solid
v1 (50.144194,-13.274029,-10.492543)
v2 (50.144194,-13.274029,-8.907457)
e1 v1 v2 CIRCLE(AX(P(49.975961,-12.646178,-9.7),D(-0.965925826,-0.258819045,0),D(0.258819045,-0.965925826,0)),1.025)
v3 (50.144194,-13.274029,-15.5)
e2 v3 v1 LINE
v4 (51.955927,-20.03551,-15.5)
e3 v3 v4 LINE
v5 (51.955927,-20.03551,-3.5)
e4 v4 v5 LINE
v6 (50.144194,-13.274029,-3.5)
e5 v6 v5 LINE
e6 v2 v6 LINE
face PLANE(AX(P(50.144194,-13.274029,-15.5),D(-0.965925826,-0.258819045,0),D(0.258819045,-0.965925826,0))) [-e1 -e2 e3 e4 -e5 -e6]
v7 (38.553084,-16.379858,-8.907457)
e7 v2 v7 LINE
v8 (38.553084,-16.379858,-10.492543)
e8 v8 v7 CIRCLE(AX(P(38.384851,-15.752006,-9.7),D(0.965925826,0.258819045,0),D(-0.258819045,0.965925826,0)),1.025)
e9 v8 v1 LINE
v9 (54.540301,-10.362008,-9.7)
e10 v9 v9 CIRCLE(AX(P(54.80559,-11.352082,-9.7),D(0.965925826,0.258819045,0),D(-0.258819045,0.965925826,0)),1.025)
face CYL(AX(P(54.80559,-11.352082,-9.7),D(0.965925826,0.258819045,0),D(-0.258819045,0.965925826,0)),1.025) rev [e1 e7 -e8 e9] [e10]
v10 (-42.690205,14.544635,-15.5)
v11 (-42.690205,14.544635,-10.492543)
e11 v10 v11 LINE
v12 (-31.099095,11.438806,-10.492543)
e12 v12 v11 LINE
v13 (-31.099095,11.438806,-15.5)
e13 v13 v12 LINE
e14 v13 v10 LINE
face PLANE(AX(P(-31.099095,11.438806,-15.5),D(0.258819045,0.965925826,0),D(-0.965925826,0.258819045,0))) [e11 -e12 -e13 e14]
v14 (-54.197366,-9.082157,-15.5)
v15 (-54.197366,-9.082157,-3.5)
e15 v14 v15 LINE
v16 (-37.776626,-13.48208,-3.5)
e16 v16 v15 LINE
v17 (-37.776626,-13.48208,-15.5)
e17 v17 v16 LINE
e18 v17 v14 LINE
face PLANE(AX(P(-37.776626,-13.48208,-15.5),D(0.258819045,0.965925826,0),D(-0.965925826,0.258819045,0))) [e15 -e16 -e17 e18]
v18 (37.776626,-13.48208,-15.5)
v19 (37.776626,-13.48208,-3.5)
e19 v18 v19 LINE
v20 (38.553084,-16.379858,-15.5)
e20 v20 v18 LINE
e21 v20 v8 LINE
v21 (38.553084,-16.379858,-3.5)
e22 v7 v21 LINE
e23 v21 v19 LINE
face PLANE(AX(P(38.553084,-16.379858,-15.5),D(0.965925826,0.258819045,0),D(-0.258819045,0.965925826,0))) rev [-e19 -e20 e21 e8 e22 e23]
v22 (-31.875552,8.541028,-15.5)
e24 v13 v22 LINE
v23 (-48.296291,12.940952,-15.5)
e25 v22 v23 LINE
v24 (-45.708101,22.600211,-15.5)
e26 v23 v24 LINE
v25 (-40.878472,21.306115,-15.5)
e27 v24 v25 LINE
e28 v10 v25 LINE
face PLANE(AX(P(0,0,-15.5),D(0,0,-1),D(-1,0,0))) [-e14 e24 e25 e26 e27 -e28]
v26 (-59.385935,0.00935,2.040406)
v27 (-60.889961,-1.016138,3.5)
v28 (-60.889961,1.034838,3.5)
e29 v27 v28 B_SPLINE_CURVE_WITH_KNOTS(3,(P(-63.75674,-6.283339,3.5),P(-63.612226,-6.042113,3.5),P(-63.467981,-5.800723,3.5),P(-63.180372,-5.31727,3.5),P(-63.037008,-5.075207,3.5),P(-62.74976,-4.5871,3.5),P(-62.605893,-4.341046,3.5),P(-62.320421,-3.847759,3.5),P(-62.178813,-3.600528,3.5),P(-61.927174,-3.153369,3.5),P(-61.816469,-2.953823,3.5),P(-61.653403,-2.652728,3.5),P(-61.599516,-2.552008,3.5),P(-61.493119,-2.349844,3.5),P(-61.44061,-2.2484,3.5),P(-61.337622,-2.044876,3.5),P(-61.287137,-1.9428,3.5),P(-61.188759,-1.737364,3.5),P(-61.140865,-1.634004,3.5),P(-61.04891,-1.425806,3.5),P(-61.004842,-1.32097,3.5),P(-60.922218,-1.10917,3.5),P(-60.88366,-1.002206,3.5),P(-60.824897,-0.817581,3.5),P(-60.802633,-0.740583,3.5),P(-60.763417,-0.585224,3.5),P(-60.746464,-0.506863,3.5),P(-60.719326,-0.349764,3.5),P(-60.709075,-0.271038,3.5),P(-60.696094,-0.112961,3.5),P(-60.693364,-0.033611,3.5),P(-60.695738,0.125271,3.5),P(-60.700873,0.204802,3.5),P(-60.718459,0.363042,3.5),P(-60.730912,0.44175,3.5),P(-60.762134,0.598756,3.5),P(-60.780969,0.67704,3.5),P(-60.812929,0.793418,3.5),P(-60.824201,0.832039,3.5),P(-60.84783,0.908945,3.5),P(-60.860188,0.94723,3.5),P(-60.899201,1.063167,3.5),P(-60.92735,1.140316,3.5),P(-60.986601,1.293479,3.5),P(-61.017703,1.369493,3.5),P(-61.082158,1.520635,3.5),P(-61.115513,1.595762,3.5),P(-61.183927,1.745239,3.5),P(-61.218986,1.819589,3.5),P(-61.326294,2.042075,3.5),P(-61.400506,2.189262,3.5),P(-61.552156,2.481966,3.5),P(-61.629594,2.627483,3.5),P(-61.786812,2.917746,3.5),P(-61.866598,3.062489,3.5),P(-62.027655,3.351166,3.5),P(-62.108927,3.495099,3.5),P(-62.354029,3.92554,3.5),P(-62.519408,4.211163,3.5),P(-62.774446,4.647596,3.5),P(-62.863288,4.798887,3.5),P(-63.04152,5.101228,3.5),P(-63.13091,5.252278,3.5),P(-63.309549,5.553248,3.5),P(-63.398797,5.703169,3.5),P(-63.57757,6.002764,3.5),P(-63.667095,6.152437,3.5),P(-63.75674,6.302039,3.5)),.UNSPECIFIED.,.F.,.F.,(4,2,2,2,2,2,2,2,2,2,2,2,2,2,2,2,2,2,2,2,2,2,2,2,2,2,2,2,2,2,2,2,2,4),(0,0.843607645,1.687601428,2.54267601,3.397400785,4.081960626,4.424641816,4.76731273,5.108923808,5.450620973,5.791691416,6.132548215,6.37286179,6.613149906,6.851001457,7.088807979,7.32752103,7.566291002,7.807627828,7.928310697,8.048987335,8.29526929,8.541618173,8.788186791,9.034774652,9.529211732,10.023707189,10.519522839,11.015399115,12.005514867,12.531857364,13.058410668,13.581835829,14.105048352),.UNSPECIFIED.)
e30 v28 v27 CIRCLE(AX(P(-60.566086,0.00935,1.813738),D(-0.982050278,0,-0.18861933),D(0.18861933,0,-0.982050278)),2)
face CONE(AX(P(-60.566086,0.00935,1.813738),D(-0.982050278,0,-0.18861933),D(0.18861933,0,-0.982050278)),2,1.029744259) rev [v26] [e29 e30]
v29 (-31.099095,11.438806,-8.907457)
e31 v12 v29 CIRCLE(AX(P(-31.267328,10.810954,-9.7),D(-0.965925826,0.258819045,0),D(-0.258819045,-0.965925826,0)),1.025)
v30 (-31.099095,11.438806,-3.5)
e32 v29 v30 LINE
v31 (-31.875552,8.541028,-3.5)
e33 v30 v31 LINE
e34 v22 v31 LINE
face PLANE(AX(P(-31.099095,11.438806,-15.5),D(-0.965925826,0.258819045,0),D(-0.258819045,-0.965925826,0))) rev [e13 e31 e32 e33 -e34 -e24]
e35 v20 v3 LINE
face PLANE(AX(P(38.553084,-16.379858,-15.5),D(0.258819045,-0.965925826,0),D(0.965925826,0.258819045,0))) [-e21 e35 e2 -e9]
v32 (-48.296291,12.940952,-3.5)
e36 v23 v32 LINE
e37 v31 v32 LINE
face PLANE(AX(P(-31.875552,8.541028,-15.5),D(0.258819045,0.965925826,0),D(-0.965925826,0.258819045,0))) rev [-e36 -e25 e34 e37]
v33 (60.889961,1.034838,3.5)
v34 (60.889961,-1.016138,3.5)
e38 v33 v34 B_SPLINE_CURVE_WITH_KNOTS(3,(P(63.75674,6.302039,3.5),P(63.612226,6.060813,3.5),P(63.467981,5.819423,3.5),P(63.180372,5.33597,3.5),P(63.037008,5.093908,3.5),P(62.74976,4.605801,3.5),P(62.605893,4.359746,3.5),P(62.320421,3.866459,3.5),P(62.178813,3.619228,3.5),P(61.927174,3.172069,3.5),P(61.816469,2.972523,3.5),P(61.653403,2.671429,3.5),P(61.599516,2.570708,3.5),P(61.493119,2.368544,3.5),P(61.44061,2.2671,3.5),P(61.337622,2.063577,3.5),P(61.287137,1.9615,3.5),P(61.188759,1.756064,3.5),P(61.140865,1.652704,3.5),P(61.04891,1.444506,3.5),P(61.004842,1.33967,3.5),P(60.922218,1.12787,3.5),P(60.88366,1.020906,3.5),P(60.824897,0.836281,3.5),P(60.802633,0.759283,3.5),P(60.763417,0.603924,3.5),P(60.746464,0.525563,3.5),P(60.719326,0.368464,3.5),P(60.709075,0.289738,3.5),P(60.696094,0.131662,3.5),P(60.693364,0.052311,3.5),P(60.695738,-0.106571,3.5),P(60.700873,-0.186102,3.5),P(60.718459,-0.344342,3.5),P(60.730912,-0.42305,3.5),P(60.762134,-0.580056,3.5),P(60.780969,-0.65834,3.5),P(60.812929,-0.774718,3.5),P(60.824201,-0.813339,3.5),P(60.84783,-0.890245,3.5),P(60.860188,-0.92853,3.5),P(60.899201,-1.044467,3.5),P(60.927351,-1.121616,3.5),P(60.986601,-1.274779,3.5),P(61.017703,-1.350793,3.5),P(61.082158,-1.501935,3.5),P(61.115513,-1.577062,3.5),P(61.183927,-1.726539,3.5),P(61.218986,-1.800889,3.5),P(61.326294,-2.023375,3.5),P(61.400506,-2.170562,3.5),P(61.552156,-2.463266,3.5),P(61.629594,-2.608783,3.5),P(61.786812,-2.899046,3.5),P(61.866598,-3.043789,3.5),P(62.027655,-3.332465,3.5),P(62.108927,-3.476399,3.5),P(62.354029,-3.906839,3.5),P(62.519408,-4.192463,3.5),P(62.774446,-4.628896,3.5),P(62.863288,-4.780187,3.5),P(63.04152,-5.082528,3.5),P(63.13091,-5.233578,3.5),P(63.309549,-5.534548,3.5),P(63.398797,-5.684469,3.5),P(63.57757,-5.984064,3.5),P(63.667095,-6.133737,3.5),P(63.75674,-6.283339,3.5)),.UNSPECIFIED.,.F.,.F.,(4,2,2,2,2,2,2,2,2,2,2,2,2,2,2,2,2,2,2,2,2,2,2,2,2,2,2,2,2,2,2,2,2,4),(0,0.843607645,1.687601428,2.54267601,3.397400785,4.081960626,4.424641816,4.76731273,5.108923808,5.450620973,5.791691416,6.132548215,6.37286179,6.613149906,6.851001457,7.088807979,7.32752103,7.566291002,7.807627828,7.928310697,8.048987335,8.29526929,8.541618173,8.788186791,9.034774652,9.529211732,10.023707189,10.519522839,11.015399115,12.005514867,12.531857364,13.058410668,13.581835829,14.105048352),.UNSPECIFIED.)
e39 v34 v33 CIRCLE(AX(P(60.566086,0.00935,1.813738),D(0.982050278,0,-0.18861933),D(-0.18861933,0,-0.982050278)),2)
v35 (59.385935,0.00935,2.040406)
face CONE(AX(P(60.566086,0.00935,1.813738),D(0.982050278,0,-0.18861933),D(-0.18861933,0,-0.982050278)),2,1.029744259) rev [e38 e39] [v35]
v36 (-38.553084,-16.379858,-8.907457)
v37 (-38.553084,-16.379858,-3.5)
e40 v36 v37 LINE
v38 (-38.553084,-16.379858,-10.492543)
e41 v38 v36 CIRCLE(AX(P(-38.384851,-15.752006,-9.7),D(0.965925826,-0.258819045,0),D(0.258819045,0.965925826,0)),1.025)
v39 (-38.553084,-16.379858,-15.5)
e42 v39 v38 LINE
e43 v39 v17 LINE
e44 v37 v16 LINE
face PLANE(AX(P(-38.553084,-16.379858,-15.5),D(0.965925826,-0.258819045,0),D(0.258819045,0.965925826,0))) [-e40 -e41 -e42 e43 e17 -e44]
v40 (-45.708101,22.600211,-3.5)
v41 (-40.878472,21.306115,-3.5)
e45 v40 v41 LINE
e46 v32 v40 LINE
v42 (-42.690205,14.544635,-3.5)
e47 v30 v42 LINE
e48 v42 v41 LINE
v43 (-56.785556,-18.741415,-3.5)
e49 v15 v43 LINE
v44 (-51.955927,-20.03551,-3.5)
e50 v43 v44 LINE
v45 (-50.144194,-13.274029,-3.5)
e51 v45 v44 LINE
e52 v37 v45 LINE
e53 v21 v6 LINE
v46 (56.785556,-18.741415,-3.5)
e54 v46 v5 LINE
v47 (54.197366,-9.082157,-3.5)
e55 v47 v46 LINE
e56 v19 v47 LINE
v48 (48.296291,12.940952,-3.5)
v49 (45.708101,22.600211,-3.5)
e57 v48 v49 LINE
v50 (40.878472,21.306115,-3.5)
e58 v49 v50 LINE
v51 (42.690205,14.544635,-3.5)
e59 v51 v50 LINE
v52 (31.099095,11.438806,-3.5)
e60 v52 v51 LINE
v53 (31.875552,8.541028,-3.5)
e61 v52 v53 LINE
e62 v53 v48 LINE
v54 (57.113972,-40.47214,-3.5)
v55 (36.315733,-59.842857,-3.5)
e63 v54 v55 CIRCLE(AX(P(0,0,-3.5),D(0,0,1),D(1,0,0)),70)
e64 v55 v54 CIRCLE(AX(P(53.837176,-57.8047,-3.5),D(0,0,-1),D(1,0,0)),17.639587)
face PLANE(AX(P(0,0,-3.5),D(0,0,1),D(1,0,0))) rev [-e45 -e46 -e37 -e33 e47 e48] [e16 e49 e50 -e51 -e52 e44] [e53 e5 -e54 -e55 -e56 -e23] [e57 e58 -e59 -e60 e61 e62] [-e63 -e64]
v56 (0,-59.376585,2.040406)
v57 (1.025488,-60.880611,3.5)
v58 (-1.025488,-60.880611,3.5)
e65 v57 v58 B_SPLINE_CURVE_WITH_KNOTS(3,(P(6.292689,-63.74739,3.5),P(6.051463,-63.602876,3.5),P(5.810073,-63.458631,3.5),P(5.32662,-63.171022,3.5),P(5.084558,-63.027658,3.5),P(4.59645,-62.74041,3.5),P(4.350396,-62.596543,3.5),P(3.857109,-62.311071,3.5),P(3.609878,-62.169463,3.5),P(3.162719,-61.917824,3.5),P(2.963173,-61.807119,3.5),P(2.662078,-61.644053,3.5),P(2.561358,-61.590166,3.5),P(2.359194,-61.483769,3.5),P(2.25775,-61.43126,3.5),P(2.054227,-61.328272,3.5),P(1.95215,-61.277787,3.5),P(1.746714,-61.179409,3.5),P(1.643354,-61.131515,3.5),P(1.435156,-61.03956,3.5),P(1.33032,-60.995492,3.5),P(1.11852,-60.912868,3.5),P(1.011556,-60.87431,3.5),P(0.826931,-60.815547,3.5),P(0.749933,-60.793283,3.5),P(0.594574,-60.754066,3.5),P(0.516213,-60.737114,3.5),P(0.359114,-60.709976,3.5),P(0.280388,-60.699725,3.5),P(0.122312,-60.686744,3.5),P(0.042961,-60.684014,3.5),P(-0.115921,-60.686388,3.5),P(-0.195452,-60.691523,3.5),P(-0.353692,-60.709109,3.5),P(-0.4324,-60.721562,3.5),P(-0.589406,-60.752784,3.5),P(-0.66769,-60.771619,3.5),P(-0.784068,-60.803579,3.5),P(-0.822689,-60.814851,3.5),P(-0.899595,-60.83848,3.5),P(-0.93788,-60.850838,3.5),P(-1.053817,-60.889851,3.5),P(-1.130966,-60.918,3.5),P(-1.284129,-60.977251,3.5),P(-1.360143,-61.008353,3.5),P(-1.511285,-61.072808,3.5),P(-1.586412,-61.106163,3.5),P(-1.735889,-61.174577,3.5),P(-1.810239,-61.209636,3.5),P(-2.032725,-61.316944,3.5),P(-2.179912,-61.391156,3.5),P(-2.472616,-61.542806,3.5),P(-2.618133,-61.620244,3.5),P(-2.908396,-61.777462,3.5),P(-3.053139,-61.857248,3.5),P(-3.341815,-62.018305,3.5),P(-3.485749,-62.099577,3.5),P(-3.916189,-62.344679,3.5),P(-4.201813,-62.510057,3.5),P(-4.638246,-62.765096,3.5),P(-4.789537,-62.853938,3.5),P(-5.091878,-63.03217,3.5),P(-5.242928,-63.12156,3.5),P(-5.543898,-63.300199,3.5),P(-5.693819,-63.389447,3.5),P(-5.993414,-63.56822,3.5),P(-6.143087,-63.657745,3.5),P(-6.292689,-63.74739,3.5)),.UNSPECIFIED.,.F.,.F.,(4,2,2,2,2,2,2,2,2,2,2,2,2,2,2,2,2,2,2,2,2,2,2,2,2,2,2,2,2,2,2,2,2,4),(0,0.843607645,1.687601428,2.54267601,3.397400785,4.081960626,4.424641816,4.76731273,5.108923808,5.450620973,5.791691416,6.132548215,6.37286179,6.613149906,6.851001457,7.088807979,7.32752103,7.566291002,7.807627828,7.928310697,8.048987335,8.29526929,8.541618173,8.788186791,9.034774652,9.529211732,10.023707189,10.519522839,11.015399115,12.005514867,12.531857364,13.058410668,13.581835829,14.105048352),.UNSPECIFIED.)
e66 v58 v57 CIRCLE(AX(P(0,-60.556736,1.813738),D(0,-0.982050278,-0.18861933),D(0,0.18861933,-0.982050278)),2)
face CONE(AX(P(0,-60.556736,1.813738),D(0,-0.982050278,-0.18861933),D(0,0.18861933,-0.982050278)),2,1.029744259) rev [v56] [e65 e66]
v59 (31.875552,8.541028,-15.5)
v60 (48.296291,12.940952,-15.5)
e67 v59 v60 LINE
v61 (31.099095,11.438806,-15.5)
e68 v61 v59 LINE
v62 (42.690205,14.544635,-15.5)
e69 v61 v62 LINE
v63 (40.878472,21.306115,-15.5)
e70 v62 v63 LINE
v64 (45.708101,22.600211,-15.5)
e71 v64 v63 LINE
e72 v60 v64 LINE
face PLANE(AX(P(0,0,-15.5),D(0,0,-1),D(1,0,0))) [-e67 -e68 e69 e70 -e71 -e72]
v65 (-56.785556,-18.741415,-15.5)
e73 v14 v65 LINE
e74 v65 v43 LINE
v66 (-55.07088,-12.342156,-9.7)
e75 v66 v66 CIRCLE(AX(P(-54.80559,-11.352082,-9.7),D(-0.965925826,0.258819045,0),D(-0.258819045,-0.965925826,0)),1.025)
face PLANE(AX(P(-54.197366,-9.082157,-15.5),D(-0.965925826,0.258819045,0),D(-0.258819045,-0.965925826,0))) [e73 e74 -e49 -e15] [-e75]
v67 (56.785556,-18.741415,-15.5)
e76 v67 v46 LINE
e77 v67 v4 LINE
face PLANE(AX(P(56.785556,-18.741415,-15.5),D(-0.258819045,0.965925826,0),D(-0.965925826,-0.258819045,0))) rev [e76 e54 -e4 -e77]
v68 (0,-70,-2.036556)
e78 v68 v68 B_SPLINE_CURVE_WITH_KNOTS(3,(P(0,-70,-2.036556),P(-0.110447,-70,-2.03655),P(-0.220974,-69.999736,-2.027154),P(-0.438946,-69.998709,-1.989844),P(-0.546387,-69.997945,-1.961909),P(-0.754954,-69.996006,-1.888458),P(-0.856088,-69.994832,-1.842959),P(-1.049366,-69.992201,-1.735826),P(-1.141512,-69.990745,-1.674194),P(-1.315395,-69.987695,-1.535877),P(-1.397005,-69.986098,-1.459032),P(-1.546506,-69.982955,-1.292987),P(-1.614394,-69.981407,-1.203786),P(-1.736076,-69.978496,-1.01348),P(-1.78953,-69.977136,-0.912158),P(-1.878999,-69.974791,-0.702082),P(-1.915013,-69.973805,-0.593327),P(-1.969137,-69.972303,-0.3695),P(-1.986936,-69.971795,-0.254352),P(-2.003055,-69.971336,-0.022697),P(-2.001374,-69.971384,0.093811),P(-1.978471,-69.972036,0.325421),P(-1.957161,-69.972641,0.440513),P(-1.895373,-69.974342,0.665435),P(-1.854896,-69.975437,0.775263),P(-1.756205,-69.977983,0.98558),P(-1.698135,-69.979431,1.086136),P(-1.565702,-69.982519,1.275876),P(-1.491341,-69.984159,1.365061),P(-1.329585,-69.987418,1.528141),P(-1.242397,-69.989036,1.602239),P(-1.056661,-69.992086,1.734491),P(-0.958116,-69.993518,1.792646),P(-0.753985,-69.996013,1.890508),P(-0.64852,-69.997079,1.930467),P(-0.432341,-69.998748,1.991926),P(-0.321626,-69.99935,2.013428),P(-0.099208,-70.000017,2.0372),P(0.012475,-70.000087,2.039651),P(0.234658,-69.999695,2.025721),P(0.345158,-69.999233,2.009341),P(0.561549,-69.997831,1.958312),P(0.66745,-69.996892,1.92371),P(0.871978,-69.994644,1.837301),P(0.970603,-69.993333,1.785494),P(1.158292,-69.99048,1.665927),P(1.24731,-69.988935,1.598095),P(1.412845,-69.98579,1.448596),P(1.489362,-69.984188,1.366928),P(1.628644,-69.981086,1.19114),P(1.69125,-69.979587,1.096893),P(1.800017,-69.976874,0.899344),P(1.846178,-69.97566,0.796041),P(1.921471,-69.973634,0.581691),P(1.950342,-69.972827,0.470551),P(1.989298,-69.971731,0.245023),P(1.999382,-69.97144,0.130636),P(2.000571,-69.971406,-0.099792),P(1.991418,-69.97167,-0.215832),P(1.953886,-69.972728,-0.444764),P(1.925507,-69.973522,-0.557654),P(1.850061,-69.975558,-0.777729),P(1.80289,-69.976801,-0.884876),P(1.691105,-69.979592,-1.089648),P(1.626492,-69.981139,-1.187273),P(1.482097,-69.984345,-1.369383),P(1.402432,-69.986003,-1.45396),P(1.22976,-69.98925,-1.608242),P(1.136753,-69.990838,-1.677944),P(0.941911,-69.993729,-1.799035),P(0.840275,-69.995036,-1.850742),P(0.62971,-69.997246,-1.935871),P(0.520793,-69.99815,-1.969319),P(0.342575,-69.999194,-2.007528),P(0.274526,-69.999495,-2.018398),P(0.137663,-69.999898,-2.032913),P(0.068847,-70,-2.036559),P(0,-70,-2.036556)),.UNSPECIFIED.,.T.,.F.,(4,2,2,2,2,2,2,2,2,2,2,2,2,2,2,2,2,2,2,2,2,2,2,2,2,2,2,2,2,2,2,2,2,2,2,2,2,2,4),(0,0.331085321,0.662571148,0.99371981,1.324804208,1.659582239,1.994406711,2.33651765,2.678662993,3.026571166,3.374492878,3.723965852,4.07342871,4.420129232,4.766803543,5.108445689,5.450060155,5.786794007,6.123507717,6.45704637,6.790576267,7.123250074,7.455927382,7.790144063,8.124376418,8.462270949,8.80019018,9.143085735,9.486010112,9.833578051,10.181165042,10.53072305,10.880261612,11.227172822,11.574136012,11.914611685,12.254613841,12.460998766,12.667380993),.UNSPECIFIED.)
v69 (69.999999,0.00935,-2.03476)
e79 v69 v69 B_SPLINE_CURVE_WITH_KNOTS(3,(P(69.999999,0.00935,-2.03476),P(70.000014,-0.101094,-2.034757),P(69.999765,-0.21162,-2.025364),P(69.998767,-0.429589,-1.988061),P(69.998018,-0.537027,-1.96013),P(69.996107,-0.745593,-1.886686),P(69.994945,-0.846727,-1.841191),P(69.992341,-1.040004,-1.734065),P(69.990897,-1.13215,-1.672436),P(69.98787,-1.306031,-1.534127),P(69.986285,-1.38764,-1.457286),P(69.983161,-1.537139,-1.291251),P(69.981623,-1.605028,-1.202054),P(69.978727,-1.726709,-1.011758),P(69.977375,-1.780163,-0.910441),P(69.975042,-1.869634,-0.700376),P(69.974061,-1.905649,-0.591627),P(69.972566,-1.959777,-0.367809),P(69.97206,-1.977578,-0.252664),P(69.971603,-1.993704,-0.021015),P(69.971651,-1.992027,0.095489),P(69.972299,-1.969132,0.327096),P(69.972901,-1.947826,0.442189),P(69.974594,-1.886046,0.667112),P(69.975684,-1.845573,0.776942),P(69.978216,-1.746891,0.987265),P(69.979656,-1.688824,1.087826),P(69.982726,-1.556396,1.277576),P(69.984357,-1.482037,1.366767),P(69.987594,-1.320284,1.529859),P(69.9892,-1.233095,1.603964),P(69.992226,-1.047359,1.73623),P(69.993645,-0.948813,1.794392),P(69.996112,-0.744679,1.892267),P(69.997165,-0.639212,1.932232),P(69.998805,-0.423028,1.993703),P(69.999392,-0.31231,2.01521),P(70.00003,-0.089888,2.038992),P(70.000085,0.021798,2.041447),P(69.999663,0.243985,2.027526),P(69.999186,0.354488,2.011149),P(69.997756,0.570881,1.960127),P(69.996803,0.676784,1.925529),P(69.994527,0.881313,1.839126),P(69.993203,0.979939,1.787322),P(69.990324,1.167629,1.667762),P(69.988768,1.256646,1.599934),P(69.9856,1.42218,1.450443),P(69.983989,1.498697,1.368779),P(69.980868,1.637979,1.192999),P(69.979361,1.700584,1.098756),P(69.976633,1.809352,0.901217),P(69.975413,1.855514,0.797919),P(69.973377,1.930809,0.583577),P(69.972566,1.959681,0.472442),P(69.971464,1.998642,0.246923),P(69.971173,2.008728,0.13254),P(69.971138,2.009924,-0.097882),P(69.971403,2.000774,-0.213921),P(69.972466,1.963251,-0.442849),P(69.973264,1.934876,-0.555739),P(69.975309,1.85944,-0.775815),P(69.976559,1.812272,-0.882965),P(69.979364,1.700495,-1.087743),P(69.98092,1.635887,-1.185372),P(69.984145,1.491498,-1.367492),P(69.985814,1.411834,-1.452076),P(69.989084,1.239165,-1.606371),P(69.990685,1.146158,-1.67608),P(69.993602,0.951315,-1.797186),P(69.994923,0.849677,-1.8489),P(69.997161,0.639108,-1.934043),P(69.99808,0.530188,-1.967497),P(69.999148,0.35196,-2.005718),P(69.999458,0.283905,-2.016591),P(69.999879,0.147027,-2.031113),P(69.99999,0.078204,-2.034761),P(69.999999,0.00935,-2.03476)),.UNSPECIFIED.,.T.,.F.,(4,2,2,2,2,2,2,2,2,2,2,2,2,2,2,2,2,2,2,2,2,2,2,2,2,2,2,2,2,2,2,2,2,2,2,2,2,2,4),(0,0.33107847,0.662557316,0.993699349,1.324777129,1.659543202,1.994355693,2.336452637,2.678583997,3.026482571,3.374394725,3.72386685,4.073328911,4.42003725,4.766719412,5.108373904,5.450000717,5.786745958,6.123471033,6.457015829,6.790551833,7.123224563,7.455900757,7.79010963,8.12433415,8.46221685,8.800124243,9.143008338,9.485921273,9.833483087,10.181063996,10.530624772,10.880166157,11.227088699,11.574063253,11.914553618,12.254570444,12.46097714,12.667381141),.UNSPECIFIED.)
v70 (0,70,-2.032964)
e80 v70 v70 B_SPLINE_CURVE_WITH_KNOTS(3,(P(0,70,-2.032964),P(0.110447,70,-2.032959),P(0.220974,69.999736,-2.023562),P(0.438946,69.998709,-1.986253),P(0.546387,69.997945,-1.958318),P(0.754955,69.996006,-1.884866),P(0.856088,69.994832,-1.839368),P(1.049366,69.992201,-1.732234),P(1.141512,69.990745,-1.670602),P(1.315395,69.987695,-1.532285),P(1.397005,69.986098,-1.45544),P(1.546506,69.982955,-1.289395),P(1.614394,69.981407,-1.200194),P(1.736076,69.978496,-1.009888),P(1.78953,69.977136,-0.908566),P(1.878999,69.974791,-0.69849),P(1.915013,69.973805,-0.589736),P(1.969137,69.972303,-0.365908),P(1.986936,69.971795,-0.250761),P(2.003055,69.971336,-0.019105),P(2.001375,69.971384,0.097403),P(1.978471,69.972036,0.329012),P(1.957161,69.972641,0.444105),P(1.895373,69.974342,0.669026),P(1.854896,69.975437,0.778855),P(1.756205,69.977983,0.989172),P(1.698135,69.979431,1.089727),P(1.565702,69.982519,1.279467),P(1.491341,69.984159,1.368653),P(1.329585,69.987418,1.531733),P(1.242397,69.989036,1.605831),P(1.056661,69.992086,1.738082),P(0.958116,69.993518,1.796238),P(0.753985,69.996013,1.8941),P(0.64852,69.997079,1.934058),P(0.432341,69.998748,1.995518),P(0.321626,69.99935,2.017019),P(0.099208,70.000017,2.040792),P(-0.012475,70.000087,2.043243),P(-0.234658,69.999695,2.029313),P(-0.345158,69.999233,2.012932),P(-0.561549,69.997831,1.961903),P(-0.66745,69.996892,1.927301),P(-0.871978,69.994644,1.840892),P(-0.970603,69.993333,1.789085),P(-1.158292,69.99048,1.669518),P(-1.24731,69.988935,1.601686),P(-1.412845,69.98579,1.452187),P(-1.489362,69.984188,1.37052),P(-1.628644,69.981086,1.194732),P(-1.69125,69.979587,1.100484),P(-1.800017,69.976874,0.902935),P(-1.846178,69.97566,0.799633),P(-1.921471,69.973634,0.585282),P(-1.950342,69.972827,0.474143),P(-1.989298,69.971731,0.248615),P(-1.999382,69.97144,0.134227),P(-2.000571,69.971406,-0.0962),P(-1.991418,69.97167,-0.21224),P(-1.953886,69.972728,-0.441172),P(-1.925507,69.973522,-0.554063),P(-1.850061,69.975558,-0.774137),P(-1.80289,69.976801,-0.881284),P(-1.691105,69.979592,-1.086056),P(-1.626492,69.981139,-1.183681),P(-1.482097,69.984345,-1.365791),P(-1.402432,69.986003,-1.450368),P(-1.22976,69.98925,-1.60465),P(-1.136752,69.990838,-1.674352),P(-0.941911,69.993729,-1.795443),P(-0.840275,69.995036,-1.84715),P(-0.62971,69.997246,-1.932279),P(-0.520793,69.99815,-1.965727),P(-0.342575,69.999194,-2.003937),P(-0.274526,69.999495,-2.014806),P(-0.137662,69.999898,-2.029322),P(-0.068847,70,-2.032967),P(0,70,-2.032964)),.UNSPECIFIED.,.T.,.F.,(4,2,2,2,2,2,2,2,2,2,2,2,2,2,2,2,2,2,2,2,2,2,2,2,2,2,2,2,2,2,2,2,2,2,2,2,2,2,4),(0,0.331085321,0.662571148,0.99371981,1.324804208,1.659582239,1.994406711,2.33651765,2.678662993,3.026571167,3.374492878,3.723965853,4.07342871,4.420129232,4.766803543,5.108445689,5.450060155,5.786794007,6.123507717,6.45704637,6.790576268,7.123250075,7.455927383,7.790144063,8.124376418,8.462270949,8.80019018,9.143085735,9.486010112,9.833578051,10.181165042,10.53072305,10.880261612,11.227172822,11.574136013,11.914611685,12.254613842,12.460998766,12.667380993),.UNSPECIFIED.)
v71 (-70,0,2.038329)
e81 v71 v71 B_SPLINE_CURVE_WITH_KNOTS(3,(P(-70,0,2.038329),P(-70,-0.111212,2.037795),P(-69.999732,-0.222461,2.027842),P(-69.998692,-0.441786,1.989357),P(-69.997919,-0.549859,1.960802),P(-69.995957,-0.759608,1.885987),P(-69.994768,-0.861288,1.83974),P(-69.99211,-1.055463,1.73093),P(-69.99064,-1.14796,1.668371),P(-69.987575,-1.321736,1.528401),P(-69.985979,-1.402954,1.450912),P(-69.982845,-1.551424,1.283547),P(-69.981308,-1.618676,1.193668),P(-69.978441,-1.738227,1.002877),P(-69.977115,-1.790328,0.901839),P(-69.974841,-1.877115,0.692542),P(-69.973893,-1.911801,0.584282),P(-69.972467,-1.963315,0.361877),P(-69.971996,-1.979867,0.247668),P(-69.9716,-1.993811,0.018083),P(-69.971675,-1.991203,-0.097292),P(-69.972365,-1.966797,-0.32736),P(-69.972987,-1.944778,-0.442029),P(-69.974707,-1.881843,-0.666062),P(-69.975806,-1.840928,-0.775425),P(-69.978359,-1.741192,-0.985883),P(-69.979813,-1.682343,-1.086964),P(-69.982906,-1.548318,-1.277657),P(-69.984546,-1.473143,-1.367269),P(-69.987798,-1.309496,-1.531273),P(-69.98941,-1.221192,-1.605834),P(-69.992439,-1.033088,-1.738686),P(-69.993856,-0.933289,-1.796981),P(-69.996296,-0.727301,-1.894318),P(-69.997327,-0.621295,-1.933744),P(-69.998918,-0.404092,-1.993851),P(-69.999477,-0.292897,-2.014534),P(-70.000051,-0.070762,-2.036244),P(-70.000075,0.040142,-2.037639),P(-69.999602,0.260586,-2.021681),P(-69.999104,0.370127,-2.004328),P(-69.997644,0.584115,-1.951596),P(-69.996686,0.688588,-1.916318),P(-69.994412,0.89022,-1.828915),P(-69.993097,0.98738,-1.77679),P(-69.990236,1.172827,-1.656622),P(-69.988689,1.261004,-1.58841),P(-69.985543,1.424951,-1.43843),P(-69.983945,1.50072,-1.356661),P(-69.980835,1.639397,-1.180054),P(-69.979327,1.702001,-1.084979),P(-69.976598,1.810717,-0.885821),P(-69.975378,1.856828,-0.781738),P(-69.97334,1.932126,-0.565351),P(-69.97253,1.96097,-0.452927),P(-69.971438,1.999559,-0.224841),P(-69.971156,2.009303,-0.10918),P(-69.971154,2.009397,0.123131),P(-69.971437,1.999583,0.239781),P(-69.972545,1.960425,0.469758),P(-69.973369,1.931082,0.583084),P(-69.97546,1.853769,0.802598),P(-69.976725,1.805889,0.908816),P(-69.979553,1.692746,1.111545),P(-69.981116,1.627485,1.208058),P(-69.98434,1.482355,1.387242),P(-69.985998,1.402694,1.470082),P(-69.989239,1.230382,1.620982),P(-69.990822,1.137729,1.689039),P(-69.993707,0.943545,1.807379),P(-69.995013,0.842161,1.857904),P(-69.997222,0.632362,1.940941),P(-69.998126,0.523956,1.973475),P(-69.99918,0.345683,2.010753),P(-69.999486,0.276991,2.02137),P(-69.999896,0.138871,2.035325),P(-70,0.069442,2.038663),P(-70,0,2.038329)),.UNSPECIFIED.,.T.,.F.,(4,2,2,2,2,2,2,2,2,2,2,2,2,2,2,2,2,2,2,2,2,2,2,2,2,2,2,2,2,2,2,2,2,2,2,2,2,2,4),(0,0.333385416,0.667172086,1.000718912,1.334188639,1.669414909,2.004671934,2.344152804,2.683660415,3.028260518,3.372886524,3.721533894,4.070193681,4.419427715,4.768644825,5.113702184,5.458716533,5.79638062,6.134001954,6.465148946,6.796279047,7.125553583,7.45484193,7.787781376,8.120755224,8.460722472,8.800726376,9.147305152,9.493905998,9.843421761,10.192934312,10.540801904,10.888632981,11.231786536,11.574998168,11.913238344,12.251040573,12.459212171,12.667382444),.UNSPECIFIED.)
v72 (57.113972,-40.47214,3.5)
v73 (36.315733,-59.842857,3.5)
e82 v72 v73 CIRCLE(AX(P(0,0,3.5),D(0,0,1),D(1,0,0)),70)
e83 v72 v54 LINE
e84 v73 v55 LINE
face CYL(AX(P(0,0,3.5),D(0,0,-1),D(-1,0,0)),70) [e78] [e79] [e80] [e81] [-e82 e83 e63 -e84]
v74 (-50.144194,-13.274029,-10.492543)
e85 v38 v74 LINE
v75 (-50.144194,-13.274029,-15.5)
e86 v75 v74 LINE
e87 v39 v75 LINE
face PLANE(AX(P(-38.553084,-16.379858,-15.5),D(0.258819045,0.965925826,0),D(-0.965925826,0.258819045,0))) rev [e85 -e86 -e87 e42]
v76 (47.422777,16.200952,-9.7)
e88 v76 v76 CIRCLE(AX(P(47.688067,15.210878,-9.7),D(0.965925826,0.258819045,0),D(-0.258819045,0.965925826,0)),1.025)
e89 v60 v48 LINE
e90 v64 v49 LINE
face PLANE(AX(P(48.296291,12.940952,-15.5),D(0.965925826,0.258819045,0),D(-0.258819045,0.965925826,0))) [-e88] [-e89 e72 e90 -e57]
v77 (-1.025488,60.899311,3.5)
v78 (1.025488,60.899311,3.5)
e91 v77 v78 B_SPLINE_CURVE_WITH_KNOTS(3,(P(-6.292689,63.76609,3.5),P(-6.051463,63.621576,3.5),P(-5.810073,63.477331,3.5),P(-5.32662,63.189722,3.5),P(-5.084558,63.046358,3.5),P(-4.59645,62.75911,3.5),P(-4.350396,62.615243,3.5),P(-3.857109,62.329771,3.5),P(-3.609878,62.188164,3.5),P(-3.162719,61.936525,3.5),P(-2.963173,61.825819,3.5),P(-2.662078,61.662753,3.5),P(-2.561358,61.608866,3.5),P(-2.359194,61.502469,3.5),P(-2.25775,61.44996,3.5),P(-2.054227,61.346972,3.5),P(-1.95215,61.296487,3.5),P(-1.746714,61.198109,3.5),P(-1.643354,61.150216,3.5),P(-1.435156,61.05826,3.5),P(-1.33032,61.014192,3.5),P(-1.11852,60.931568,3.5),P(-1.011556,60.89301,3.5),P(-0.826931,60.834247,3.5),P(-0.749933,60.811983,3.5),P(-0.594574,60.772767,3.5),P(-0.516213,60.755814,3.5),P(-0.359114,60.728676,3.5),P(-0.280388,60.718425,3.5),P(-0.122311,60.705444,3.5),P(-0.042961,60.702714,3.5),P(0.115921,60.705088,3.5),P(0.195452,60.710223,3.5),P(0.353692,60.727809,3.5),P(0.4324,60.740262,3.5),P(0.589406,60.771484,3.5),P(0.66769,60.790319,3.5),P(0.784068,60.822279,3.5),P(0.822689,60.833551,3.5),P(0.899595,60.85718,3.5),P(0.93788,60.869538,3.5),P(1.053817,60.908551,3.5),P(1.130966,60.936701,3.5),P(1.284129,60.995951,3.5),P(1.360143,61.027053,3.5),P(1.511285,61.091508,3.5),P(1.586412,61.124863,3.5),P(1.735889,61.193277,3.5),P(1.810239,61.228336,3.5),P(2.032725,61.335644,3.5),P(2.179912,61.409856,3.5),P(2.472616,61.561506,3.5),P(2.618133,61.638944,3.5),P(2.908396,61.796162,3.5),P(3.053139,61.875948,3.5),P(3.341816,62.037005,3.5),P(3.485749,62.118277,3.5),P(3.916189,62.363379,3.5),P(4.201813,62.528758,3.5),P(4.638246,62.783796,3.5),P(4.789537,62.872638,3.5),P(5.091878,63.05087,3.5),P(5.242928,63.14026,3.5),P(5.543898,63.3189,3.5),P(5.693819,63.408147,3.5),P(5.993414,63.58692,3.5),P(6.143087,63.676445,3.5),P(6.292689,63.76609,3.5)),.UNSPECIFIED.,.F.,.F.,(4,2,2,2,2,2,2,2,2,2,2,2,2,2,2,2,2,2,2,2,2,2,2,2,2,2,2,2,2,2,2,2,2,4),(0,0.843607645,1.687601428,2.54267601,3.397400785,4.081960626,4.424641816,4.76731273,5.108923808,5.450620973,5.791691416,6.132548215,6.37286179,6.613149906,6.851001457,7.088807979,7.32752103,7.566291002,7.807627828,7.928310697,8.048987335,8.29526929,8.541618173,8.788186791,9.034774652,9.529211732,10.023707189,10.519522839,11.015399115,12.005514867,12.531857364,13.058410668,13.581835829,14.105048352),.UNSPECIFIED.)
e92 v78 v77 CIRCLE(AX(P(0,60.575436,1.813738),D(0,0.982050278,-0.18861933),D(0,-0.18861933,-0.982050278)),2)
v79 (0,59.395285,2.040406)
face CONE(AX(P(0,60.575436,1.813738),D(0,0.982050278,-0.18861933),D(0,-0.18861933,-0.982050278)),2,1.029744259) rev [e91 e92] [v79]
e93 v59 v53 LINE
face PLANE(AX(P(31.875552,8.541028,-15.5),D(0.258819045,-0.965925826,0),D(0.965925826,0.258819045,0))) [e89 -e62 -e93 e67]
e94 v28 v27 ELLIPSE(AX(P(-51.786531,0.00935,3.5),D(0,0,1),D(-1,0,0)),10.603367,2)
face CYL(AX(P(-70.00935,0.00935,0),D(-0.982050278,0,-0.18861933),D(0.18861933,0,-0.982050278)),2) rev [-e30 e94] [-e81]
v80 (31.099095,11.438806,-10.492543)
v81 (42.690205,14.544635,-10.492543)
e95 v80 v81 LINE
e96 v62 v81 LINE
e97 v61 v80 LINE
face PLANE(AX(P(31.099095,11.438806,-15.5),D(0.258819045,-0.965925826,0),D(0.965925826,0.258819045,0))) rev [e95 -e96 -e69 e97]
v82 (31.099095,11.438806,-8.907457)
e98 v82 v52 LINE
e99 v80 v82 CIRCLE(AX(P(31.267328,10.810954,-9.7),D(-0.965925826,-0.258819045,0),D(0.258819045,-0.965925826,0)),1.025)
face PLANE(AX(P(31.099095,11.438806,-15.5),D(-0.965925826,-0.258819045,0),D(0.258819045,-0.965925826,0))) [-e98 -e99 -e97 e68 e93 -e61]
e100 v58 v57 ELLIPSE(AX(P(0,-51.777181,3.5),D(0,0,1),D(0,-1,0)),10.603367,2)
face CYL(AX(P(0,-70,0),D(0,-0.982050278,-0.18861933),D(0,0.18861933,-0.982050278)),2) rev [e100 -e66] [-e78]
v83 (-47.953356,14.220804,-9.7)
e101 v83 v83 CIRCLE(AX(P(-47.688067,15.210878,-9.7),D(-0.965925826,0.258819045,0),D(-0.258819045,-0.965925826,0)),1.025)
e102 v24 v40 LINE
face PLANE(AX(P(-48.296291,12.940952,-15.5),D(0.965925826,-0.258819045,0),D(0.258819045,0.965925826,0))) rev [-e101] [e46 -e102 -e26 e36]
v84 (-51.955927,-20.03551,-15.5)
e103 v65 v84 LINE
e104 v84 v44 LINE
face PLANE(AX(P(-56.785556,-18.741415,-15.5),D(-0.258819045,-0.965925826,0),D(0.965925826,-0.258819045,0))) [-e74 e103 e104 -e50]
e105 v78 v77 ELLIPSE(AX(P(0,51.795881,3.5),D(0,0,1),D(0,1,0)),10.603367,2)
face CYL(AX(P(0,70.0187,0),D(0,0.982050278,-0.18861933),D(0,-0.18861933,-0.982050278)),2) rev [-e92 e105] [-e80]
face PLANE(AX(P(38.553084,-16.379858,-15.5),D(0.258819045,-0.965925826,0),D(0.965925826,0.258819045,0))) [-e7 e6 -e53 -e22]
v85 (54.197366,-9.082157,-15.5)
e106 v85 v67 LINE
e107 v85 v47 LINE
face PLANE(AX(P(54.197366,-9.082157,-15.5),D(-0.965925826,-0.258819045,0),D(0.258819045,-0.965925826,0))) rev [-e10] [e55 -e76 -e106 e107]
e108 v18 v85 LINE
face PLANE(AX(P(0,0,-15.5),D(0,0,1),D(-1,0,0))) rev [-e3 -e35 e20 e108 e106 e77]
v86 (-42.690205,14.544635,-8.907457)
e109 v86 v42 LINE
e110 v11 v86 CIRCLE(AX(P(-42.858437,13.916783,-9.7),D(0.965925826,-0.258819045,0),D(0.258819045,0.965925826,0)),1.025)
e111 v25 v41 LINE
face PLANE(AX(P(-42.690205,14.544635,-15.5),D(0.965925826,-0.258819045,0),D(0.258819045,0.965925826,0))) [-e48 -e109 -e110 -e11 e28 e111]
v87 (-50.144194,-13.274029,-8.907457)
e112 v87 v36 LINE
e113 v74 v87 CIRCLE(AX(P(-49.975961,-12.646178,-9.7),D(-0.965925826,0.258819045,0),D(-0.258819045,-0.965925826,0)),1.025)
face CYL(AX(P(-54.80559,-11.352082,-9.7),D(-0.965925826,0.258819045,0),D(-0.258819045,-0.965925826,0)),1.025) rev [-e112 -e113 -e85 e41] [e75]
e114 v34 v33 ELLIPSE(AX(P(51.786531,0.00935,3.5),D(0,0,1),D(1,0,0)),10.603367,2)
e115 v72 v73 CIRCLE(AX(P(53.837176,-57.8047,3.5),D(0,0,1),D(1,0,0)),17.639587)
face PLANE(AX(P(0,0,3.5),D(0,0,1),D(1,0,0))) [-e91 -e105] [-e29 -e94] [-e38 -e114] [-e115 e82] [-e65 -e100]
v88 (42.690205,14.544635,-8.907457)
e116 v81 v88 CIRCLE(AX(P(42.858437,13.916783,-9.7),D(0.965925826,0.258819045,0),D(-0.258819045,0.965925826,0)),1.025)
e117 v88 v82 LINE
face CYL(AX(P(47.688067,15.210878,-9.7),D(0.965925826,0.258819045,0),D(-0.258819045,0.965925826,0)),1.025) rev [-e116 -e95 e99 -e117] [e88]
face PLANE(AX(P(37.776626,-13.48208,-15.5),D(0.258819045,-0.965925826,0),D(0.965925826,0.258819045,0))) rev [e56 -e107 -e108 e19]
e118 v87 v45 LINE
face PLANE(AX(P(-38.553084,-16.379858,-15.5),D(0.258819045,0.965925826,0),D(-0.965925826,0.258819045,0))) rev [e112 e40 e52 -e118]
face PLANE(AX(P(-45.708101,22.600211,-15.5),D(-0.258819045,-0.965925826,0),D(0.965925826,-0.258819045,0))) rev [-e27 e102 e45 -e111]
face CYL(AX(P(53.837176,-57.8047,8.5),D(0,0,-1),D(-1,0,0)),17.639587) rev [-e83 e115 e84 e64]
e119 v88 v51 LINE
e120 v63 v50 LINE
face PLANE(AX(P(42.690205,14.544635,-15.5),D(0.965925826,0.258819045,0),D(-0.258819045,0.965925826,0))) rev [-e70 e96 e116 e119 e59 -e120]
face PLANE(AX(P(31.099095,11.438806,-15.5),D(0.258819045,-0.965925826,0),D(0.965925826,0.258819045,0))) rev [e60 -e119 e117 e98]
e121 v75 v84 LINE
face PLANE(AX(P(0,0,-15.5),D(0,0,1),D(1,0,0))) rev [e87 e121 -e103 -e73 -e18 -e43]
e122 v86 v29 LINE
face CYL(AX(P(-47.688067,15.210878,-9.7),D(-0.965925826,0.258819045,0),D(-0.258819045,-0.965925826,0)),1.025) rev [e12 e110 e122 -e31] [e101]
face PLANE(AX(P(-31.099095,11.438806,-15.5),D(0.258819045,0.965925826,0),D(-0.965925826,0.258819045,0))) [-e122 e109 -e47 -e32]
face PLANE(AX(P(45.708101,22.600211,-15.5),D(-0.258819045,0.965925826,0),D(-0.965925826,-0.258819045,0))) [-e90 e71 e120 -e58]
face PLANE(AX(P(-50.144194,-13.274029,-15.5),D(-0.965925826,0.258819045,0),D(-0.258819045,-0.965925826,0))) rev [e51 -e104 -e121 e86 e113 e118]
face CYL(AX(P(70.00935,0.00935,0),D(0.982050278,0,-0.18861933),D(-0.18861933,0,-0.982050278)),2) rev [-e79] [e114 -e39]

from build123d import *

# Parameters (mm, degrees)
SKETCH1_R               = 70
BOSS_EXTRUDE1_DEPTH     = 3.5
BOSS_EXTRUDE2_DEPTH     = 12
M2_5_TAPPED_HOLE1_D     = 2.05
M2_5_TAPPED_HOLE1_DEPTH = 17
CUT_EXTRUDE4_START      = -12
CUT_EXTRUDE4_DEPTH      = 12


# Read off the part's stored shape, not the designer's step: CirPattern1
with BuildPart() as part:
    # Sketch1 → Boss-Extrude1 (new, symmetric)
    with BuildSketch(Plane.XY):
        Circle(SKETCH1_R)
    extrude(amount=BOSS_EXTRUDE1_DEPTH, both=True)

    # Sketch13 → Cut-Revolve1 (revolve, cut)
    with BuildSketch(Plane(origin=(0, 0, 0), x_dir=(0, 0, -1), z_dir=(1, 0, 0))):
        Polygon((-2.040406099, -59.376585203), (0.072455051, -70.377238659), (2.036555607, -70), (0.150362311, -60.17949722), align=None)
    revolve(axis=Axis((0, -70, 0), (0, 0.982050277997827, 0.18861932956192706)), mode=Mode.SUBTRACT)

    # CirPattern1 outline → CirPattern1 (revolve, cut)
    with BuildSketch(Plane(origin=(2.490740254, 0.009350069, 12.968088503), x_dir=(0, 1, 0), z_dir=(-0.188619329561927, 0, -0.982050277997827))):
        Polygon((0, 57.935114232), (2, 59.13683547), (2, 69.127313847), (0, 69.127313847), align=None)
    revolve(axis=Axis((2.490740254, 0.009350069, 12.968088503), (0.982050277997827, 0, -0.188619329561927)), mode=Mode.SUBTRACT)

    # CirPattern1 2 outline → CirPattern1 2 (revolve, cut)
    with BuildSketch(Plane(origin=(2e-08, 2.491072904, 12.969820451), x_dir=(1, 0, 0), z_dir=(0, 0.188619329561927, 0.982050277997827))):
        Polygon((0, 57.94429647), (2, 59.146017708), (2, 69.126976101), (0, 69.126976101), align=None)
    revolve(axis=Axis((2e-08, 2.491072904, 12.969820451), (0, 0.982050277997827, -0.188619329561927)), mode=Mode.SUBTRACT)

    # CirPattern1 3 outline → CirPattern1 3 (revolve, cut)
    with BuildSketch(Plane(origin=(-2.490740254, 0.009350089, 12.9680885), x_dir=(0, 1, 0), z_dir=(0.188619329561927, 0, -0.982050277997827))):
        Polygon((2, -69.127431112), (2, -59.136835451), (0, -57.935114213), (0, -69.127431112), align=None)
    revolve(axis=Axis((-2.490740254, 0.009350089, 12.9680885), (0.982050277997827, 0, 0.188619329561927)), mode=Mode.SUBTRACT)

    # Sketch4 → Boss-Extrude2 (add)
    with BuildSketch(Plane(origin=(0, 0, -3.5), x_dir=(-1, 0, 0), z_dir=(0, 0, -1))):
        Polygon((31.875552268, 8.541028488), (48.296291314, 12.940952255), (45.708100863, 22.600210518), (40.878471732, 21.306115293), (42.690205048, 14.544634508), (31.099095132, 11.438805967), align=None)
        Polygon((56.785555994, -18.741414847), (51.955926862, -20.035510073), (50.144193547, -13.274029289), (38.553083631, -16.37985783), (37.776626496, -13.482080351), (54.197365543, -9.082156584), align=None)
    boss_extrude2 = extrude(amount=BOSS_EXTRUDE2_DEPTH)

    # M2.5 Tapped Hole1
    with Locations(Plane(origin=(-48.296291314, 12.940952255, 0), x_dir=(0, 0, 1), z_dir=(-0.9659258262890691, 0.2588190451025179, 0))):
        with Locations((-9.7, 2.35), (-9.7, -25.15)):
            m2_5_tapped_hole1 = Hole(M2_5_TAPPED_HOLE1_D / 2, depth=M2_5_TAPPED_HOLE1_DEPTH)

    # Mirror1: Boss-Extrude2, M2.5 Tapped Hole1 across plane
    add(boss_extrude2.mirror(Plane(origin=(0, 0, 0), x_dir=(0, 0, 1), z_dir=(1, 0, 0))))
    add(m2_5_tapped_hole1.mirror(Plane(origin=(0, 0, 0), x_dir=(0, 0, 1), z_dir=(1, 0, 0))), mode=Mode.SUBTRACT)

    # Sketch7 → Cut-Extrude4 (cut)
    with BuildSketch(Plane(origin=(0, 0, -3.5), x_dir=(-1, 0, 0), z_dir=(0, 0, -1)).offset(CUT_EXTRUDE4_START)):
        with BuildLine():
            ThreePointArc((-57.113972469, -40.472140403), (-41.814961007, -44.896509701), (-36.315733397, -59.842856782))
            ThreePointArc((-36.315733397, -59.842856782), (-47.708318434, -51.224177419), (-57.113972469, -40.472140403))
        make_face()
    extrude(amount=CUT_EXTRUDE4_DEPTH, mode=Mode.SUBTRACT)


solid = part.part
